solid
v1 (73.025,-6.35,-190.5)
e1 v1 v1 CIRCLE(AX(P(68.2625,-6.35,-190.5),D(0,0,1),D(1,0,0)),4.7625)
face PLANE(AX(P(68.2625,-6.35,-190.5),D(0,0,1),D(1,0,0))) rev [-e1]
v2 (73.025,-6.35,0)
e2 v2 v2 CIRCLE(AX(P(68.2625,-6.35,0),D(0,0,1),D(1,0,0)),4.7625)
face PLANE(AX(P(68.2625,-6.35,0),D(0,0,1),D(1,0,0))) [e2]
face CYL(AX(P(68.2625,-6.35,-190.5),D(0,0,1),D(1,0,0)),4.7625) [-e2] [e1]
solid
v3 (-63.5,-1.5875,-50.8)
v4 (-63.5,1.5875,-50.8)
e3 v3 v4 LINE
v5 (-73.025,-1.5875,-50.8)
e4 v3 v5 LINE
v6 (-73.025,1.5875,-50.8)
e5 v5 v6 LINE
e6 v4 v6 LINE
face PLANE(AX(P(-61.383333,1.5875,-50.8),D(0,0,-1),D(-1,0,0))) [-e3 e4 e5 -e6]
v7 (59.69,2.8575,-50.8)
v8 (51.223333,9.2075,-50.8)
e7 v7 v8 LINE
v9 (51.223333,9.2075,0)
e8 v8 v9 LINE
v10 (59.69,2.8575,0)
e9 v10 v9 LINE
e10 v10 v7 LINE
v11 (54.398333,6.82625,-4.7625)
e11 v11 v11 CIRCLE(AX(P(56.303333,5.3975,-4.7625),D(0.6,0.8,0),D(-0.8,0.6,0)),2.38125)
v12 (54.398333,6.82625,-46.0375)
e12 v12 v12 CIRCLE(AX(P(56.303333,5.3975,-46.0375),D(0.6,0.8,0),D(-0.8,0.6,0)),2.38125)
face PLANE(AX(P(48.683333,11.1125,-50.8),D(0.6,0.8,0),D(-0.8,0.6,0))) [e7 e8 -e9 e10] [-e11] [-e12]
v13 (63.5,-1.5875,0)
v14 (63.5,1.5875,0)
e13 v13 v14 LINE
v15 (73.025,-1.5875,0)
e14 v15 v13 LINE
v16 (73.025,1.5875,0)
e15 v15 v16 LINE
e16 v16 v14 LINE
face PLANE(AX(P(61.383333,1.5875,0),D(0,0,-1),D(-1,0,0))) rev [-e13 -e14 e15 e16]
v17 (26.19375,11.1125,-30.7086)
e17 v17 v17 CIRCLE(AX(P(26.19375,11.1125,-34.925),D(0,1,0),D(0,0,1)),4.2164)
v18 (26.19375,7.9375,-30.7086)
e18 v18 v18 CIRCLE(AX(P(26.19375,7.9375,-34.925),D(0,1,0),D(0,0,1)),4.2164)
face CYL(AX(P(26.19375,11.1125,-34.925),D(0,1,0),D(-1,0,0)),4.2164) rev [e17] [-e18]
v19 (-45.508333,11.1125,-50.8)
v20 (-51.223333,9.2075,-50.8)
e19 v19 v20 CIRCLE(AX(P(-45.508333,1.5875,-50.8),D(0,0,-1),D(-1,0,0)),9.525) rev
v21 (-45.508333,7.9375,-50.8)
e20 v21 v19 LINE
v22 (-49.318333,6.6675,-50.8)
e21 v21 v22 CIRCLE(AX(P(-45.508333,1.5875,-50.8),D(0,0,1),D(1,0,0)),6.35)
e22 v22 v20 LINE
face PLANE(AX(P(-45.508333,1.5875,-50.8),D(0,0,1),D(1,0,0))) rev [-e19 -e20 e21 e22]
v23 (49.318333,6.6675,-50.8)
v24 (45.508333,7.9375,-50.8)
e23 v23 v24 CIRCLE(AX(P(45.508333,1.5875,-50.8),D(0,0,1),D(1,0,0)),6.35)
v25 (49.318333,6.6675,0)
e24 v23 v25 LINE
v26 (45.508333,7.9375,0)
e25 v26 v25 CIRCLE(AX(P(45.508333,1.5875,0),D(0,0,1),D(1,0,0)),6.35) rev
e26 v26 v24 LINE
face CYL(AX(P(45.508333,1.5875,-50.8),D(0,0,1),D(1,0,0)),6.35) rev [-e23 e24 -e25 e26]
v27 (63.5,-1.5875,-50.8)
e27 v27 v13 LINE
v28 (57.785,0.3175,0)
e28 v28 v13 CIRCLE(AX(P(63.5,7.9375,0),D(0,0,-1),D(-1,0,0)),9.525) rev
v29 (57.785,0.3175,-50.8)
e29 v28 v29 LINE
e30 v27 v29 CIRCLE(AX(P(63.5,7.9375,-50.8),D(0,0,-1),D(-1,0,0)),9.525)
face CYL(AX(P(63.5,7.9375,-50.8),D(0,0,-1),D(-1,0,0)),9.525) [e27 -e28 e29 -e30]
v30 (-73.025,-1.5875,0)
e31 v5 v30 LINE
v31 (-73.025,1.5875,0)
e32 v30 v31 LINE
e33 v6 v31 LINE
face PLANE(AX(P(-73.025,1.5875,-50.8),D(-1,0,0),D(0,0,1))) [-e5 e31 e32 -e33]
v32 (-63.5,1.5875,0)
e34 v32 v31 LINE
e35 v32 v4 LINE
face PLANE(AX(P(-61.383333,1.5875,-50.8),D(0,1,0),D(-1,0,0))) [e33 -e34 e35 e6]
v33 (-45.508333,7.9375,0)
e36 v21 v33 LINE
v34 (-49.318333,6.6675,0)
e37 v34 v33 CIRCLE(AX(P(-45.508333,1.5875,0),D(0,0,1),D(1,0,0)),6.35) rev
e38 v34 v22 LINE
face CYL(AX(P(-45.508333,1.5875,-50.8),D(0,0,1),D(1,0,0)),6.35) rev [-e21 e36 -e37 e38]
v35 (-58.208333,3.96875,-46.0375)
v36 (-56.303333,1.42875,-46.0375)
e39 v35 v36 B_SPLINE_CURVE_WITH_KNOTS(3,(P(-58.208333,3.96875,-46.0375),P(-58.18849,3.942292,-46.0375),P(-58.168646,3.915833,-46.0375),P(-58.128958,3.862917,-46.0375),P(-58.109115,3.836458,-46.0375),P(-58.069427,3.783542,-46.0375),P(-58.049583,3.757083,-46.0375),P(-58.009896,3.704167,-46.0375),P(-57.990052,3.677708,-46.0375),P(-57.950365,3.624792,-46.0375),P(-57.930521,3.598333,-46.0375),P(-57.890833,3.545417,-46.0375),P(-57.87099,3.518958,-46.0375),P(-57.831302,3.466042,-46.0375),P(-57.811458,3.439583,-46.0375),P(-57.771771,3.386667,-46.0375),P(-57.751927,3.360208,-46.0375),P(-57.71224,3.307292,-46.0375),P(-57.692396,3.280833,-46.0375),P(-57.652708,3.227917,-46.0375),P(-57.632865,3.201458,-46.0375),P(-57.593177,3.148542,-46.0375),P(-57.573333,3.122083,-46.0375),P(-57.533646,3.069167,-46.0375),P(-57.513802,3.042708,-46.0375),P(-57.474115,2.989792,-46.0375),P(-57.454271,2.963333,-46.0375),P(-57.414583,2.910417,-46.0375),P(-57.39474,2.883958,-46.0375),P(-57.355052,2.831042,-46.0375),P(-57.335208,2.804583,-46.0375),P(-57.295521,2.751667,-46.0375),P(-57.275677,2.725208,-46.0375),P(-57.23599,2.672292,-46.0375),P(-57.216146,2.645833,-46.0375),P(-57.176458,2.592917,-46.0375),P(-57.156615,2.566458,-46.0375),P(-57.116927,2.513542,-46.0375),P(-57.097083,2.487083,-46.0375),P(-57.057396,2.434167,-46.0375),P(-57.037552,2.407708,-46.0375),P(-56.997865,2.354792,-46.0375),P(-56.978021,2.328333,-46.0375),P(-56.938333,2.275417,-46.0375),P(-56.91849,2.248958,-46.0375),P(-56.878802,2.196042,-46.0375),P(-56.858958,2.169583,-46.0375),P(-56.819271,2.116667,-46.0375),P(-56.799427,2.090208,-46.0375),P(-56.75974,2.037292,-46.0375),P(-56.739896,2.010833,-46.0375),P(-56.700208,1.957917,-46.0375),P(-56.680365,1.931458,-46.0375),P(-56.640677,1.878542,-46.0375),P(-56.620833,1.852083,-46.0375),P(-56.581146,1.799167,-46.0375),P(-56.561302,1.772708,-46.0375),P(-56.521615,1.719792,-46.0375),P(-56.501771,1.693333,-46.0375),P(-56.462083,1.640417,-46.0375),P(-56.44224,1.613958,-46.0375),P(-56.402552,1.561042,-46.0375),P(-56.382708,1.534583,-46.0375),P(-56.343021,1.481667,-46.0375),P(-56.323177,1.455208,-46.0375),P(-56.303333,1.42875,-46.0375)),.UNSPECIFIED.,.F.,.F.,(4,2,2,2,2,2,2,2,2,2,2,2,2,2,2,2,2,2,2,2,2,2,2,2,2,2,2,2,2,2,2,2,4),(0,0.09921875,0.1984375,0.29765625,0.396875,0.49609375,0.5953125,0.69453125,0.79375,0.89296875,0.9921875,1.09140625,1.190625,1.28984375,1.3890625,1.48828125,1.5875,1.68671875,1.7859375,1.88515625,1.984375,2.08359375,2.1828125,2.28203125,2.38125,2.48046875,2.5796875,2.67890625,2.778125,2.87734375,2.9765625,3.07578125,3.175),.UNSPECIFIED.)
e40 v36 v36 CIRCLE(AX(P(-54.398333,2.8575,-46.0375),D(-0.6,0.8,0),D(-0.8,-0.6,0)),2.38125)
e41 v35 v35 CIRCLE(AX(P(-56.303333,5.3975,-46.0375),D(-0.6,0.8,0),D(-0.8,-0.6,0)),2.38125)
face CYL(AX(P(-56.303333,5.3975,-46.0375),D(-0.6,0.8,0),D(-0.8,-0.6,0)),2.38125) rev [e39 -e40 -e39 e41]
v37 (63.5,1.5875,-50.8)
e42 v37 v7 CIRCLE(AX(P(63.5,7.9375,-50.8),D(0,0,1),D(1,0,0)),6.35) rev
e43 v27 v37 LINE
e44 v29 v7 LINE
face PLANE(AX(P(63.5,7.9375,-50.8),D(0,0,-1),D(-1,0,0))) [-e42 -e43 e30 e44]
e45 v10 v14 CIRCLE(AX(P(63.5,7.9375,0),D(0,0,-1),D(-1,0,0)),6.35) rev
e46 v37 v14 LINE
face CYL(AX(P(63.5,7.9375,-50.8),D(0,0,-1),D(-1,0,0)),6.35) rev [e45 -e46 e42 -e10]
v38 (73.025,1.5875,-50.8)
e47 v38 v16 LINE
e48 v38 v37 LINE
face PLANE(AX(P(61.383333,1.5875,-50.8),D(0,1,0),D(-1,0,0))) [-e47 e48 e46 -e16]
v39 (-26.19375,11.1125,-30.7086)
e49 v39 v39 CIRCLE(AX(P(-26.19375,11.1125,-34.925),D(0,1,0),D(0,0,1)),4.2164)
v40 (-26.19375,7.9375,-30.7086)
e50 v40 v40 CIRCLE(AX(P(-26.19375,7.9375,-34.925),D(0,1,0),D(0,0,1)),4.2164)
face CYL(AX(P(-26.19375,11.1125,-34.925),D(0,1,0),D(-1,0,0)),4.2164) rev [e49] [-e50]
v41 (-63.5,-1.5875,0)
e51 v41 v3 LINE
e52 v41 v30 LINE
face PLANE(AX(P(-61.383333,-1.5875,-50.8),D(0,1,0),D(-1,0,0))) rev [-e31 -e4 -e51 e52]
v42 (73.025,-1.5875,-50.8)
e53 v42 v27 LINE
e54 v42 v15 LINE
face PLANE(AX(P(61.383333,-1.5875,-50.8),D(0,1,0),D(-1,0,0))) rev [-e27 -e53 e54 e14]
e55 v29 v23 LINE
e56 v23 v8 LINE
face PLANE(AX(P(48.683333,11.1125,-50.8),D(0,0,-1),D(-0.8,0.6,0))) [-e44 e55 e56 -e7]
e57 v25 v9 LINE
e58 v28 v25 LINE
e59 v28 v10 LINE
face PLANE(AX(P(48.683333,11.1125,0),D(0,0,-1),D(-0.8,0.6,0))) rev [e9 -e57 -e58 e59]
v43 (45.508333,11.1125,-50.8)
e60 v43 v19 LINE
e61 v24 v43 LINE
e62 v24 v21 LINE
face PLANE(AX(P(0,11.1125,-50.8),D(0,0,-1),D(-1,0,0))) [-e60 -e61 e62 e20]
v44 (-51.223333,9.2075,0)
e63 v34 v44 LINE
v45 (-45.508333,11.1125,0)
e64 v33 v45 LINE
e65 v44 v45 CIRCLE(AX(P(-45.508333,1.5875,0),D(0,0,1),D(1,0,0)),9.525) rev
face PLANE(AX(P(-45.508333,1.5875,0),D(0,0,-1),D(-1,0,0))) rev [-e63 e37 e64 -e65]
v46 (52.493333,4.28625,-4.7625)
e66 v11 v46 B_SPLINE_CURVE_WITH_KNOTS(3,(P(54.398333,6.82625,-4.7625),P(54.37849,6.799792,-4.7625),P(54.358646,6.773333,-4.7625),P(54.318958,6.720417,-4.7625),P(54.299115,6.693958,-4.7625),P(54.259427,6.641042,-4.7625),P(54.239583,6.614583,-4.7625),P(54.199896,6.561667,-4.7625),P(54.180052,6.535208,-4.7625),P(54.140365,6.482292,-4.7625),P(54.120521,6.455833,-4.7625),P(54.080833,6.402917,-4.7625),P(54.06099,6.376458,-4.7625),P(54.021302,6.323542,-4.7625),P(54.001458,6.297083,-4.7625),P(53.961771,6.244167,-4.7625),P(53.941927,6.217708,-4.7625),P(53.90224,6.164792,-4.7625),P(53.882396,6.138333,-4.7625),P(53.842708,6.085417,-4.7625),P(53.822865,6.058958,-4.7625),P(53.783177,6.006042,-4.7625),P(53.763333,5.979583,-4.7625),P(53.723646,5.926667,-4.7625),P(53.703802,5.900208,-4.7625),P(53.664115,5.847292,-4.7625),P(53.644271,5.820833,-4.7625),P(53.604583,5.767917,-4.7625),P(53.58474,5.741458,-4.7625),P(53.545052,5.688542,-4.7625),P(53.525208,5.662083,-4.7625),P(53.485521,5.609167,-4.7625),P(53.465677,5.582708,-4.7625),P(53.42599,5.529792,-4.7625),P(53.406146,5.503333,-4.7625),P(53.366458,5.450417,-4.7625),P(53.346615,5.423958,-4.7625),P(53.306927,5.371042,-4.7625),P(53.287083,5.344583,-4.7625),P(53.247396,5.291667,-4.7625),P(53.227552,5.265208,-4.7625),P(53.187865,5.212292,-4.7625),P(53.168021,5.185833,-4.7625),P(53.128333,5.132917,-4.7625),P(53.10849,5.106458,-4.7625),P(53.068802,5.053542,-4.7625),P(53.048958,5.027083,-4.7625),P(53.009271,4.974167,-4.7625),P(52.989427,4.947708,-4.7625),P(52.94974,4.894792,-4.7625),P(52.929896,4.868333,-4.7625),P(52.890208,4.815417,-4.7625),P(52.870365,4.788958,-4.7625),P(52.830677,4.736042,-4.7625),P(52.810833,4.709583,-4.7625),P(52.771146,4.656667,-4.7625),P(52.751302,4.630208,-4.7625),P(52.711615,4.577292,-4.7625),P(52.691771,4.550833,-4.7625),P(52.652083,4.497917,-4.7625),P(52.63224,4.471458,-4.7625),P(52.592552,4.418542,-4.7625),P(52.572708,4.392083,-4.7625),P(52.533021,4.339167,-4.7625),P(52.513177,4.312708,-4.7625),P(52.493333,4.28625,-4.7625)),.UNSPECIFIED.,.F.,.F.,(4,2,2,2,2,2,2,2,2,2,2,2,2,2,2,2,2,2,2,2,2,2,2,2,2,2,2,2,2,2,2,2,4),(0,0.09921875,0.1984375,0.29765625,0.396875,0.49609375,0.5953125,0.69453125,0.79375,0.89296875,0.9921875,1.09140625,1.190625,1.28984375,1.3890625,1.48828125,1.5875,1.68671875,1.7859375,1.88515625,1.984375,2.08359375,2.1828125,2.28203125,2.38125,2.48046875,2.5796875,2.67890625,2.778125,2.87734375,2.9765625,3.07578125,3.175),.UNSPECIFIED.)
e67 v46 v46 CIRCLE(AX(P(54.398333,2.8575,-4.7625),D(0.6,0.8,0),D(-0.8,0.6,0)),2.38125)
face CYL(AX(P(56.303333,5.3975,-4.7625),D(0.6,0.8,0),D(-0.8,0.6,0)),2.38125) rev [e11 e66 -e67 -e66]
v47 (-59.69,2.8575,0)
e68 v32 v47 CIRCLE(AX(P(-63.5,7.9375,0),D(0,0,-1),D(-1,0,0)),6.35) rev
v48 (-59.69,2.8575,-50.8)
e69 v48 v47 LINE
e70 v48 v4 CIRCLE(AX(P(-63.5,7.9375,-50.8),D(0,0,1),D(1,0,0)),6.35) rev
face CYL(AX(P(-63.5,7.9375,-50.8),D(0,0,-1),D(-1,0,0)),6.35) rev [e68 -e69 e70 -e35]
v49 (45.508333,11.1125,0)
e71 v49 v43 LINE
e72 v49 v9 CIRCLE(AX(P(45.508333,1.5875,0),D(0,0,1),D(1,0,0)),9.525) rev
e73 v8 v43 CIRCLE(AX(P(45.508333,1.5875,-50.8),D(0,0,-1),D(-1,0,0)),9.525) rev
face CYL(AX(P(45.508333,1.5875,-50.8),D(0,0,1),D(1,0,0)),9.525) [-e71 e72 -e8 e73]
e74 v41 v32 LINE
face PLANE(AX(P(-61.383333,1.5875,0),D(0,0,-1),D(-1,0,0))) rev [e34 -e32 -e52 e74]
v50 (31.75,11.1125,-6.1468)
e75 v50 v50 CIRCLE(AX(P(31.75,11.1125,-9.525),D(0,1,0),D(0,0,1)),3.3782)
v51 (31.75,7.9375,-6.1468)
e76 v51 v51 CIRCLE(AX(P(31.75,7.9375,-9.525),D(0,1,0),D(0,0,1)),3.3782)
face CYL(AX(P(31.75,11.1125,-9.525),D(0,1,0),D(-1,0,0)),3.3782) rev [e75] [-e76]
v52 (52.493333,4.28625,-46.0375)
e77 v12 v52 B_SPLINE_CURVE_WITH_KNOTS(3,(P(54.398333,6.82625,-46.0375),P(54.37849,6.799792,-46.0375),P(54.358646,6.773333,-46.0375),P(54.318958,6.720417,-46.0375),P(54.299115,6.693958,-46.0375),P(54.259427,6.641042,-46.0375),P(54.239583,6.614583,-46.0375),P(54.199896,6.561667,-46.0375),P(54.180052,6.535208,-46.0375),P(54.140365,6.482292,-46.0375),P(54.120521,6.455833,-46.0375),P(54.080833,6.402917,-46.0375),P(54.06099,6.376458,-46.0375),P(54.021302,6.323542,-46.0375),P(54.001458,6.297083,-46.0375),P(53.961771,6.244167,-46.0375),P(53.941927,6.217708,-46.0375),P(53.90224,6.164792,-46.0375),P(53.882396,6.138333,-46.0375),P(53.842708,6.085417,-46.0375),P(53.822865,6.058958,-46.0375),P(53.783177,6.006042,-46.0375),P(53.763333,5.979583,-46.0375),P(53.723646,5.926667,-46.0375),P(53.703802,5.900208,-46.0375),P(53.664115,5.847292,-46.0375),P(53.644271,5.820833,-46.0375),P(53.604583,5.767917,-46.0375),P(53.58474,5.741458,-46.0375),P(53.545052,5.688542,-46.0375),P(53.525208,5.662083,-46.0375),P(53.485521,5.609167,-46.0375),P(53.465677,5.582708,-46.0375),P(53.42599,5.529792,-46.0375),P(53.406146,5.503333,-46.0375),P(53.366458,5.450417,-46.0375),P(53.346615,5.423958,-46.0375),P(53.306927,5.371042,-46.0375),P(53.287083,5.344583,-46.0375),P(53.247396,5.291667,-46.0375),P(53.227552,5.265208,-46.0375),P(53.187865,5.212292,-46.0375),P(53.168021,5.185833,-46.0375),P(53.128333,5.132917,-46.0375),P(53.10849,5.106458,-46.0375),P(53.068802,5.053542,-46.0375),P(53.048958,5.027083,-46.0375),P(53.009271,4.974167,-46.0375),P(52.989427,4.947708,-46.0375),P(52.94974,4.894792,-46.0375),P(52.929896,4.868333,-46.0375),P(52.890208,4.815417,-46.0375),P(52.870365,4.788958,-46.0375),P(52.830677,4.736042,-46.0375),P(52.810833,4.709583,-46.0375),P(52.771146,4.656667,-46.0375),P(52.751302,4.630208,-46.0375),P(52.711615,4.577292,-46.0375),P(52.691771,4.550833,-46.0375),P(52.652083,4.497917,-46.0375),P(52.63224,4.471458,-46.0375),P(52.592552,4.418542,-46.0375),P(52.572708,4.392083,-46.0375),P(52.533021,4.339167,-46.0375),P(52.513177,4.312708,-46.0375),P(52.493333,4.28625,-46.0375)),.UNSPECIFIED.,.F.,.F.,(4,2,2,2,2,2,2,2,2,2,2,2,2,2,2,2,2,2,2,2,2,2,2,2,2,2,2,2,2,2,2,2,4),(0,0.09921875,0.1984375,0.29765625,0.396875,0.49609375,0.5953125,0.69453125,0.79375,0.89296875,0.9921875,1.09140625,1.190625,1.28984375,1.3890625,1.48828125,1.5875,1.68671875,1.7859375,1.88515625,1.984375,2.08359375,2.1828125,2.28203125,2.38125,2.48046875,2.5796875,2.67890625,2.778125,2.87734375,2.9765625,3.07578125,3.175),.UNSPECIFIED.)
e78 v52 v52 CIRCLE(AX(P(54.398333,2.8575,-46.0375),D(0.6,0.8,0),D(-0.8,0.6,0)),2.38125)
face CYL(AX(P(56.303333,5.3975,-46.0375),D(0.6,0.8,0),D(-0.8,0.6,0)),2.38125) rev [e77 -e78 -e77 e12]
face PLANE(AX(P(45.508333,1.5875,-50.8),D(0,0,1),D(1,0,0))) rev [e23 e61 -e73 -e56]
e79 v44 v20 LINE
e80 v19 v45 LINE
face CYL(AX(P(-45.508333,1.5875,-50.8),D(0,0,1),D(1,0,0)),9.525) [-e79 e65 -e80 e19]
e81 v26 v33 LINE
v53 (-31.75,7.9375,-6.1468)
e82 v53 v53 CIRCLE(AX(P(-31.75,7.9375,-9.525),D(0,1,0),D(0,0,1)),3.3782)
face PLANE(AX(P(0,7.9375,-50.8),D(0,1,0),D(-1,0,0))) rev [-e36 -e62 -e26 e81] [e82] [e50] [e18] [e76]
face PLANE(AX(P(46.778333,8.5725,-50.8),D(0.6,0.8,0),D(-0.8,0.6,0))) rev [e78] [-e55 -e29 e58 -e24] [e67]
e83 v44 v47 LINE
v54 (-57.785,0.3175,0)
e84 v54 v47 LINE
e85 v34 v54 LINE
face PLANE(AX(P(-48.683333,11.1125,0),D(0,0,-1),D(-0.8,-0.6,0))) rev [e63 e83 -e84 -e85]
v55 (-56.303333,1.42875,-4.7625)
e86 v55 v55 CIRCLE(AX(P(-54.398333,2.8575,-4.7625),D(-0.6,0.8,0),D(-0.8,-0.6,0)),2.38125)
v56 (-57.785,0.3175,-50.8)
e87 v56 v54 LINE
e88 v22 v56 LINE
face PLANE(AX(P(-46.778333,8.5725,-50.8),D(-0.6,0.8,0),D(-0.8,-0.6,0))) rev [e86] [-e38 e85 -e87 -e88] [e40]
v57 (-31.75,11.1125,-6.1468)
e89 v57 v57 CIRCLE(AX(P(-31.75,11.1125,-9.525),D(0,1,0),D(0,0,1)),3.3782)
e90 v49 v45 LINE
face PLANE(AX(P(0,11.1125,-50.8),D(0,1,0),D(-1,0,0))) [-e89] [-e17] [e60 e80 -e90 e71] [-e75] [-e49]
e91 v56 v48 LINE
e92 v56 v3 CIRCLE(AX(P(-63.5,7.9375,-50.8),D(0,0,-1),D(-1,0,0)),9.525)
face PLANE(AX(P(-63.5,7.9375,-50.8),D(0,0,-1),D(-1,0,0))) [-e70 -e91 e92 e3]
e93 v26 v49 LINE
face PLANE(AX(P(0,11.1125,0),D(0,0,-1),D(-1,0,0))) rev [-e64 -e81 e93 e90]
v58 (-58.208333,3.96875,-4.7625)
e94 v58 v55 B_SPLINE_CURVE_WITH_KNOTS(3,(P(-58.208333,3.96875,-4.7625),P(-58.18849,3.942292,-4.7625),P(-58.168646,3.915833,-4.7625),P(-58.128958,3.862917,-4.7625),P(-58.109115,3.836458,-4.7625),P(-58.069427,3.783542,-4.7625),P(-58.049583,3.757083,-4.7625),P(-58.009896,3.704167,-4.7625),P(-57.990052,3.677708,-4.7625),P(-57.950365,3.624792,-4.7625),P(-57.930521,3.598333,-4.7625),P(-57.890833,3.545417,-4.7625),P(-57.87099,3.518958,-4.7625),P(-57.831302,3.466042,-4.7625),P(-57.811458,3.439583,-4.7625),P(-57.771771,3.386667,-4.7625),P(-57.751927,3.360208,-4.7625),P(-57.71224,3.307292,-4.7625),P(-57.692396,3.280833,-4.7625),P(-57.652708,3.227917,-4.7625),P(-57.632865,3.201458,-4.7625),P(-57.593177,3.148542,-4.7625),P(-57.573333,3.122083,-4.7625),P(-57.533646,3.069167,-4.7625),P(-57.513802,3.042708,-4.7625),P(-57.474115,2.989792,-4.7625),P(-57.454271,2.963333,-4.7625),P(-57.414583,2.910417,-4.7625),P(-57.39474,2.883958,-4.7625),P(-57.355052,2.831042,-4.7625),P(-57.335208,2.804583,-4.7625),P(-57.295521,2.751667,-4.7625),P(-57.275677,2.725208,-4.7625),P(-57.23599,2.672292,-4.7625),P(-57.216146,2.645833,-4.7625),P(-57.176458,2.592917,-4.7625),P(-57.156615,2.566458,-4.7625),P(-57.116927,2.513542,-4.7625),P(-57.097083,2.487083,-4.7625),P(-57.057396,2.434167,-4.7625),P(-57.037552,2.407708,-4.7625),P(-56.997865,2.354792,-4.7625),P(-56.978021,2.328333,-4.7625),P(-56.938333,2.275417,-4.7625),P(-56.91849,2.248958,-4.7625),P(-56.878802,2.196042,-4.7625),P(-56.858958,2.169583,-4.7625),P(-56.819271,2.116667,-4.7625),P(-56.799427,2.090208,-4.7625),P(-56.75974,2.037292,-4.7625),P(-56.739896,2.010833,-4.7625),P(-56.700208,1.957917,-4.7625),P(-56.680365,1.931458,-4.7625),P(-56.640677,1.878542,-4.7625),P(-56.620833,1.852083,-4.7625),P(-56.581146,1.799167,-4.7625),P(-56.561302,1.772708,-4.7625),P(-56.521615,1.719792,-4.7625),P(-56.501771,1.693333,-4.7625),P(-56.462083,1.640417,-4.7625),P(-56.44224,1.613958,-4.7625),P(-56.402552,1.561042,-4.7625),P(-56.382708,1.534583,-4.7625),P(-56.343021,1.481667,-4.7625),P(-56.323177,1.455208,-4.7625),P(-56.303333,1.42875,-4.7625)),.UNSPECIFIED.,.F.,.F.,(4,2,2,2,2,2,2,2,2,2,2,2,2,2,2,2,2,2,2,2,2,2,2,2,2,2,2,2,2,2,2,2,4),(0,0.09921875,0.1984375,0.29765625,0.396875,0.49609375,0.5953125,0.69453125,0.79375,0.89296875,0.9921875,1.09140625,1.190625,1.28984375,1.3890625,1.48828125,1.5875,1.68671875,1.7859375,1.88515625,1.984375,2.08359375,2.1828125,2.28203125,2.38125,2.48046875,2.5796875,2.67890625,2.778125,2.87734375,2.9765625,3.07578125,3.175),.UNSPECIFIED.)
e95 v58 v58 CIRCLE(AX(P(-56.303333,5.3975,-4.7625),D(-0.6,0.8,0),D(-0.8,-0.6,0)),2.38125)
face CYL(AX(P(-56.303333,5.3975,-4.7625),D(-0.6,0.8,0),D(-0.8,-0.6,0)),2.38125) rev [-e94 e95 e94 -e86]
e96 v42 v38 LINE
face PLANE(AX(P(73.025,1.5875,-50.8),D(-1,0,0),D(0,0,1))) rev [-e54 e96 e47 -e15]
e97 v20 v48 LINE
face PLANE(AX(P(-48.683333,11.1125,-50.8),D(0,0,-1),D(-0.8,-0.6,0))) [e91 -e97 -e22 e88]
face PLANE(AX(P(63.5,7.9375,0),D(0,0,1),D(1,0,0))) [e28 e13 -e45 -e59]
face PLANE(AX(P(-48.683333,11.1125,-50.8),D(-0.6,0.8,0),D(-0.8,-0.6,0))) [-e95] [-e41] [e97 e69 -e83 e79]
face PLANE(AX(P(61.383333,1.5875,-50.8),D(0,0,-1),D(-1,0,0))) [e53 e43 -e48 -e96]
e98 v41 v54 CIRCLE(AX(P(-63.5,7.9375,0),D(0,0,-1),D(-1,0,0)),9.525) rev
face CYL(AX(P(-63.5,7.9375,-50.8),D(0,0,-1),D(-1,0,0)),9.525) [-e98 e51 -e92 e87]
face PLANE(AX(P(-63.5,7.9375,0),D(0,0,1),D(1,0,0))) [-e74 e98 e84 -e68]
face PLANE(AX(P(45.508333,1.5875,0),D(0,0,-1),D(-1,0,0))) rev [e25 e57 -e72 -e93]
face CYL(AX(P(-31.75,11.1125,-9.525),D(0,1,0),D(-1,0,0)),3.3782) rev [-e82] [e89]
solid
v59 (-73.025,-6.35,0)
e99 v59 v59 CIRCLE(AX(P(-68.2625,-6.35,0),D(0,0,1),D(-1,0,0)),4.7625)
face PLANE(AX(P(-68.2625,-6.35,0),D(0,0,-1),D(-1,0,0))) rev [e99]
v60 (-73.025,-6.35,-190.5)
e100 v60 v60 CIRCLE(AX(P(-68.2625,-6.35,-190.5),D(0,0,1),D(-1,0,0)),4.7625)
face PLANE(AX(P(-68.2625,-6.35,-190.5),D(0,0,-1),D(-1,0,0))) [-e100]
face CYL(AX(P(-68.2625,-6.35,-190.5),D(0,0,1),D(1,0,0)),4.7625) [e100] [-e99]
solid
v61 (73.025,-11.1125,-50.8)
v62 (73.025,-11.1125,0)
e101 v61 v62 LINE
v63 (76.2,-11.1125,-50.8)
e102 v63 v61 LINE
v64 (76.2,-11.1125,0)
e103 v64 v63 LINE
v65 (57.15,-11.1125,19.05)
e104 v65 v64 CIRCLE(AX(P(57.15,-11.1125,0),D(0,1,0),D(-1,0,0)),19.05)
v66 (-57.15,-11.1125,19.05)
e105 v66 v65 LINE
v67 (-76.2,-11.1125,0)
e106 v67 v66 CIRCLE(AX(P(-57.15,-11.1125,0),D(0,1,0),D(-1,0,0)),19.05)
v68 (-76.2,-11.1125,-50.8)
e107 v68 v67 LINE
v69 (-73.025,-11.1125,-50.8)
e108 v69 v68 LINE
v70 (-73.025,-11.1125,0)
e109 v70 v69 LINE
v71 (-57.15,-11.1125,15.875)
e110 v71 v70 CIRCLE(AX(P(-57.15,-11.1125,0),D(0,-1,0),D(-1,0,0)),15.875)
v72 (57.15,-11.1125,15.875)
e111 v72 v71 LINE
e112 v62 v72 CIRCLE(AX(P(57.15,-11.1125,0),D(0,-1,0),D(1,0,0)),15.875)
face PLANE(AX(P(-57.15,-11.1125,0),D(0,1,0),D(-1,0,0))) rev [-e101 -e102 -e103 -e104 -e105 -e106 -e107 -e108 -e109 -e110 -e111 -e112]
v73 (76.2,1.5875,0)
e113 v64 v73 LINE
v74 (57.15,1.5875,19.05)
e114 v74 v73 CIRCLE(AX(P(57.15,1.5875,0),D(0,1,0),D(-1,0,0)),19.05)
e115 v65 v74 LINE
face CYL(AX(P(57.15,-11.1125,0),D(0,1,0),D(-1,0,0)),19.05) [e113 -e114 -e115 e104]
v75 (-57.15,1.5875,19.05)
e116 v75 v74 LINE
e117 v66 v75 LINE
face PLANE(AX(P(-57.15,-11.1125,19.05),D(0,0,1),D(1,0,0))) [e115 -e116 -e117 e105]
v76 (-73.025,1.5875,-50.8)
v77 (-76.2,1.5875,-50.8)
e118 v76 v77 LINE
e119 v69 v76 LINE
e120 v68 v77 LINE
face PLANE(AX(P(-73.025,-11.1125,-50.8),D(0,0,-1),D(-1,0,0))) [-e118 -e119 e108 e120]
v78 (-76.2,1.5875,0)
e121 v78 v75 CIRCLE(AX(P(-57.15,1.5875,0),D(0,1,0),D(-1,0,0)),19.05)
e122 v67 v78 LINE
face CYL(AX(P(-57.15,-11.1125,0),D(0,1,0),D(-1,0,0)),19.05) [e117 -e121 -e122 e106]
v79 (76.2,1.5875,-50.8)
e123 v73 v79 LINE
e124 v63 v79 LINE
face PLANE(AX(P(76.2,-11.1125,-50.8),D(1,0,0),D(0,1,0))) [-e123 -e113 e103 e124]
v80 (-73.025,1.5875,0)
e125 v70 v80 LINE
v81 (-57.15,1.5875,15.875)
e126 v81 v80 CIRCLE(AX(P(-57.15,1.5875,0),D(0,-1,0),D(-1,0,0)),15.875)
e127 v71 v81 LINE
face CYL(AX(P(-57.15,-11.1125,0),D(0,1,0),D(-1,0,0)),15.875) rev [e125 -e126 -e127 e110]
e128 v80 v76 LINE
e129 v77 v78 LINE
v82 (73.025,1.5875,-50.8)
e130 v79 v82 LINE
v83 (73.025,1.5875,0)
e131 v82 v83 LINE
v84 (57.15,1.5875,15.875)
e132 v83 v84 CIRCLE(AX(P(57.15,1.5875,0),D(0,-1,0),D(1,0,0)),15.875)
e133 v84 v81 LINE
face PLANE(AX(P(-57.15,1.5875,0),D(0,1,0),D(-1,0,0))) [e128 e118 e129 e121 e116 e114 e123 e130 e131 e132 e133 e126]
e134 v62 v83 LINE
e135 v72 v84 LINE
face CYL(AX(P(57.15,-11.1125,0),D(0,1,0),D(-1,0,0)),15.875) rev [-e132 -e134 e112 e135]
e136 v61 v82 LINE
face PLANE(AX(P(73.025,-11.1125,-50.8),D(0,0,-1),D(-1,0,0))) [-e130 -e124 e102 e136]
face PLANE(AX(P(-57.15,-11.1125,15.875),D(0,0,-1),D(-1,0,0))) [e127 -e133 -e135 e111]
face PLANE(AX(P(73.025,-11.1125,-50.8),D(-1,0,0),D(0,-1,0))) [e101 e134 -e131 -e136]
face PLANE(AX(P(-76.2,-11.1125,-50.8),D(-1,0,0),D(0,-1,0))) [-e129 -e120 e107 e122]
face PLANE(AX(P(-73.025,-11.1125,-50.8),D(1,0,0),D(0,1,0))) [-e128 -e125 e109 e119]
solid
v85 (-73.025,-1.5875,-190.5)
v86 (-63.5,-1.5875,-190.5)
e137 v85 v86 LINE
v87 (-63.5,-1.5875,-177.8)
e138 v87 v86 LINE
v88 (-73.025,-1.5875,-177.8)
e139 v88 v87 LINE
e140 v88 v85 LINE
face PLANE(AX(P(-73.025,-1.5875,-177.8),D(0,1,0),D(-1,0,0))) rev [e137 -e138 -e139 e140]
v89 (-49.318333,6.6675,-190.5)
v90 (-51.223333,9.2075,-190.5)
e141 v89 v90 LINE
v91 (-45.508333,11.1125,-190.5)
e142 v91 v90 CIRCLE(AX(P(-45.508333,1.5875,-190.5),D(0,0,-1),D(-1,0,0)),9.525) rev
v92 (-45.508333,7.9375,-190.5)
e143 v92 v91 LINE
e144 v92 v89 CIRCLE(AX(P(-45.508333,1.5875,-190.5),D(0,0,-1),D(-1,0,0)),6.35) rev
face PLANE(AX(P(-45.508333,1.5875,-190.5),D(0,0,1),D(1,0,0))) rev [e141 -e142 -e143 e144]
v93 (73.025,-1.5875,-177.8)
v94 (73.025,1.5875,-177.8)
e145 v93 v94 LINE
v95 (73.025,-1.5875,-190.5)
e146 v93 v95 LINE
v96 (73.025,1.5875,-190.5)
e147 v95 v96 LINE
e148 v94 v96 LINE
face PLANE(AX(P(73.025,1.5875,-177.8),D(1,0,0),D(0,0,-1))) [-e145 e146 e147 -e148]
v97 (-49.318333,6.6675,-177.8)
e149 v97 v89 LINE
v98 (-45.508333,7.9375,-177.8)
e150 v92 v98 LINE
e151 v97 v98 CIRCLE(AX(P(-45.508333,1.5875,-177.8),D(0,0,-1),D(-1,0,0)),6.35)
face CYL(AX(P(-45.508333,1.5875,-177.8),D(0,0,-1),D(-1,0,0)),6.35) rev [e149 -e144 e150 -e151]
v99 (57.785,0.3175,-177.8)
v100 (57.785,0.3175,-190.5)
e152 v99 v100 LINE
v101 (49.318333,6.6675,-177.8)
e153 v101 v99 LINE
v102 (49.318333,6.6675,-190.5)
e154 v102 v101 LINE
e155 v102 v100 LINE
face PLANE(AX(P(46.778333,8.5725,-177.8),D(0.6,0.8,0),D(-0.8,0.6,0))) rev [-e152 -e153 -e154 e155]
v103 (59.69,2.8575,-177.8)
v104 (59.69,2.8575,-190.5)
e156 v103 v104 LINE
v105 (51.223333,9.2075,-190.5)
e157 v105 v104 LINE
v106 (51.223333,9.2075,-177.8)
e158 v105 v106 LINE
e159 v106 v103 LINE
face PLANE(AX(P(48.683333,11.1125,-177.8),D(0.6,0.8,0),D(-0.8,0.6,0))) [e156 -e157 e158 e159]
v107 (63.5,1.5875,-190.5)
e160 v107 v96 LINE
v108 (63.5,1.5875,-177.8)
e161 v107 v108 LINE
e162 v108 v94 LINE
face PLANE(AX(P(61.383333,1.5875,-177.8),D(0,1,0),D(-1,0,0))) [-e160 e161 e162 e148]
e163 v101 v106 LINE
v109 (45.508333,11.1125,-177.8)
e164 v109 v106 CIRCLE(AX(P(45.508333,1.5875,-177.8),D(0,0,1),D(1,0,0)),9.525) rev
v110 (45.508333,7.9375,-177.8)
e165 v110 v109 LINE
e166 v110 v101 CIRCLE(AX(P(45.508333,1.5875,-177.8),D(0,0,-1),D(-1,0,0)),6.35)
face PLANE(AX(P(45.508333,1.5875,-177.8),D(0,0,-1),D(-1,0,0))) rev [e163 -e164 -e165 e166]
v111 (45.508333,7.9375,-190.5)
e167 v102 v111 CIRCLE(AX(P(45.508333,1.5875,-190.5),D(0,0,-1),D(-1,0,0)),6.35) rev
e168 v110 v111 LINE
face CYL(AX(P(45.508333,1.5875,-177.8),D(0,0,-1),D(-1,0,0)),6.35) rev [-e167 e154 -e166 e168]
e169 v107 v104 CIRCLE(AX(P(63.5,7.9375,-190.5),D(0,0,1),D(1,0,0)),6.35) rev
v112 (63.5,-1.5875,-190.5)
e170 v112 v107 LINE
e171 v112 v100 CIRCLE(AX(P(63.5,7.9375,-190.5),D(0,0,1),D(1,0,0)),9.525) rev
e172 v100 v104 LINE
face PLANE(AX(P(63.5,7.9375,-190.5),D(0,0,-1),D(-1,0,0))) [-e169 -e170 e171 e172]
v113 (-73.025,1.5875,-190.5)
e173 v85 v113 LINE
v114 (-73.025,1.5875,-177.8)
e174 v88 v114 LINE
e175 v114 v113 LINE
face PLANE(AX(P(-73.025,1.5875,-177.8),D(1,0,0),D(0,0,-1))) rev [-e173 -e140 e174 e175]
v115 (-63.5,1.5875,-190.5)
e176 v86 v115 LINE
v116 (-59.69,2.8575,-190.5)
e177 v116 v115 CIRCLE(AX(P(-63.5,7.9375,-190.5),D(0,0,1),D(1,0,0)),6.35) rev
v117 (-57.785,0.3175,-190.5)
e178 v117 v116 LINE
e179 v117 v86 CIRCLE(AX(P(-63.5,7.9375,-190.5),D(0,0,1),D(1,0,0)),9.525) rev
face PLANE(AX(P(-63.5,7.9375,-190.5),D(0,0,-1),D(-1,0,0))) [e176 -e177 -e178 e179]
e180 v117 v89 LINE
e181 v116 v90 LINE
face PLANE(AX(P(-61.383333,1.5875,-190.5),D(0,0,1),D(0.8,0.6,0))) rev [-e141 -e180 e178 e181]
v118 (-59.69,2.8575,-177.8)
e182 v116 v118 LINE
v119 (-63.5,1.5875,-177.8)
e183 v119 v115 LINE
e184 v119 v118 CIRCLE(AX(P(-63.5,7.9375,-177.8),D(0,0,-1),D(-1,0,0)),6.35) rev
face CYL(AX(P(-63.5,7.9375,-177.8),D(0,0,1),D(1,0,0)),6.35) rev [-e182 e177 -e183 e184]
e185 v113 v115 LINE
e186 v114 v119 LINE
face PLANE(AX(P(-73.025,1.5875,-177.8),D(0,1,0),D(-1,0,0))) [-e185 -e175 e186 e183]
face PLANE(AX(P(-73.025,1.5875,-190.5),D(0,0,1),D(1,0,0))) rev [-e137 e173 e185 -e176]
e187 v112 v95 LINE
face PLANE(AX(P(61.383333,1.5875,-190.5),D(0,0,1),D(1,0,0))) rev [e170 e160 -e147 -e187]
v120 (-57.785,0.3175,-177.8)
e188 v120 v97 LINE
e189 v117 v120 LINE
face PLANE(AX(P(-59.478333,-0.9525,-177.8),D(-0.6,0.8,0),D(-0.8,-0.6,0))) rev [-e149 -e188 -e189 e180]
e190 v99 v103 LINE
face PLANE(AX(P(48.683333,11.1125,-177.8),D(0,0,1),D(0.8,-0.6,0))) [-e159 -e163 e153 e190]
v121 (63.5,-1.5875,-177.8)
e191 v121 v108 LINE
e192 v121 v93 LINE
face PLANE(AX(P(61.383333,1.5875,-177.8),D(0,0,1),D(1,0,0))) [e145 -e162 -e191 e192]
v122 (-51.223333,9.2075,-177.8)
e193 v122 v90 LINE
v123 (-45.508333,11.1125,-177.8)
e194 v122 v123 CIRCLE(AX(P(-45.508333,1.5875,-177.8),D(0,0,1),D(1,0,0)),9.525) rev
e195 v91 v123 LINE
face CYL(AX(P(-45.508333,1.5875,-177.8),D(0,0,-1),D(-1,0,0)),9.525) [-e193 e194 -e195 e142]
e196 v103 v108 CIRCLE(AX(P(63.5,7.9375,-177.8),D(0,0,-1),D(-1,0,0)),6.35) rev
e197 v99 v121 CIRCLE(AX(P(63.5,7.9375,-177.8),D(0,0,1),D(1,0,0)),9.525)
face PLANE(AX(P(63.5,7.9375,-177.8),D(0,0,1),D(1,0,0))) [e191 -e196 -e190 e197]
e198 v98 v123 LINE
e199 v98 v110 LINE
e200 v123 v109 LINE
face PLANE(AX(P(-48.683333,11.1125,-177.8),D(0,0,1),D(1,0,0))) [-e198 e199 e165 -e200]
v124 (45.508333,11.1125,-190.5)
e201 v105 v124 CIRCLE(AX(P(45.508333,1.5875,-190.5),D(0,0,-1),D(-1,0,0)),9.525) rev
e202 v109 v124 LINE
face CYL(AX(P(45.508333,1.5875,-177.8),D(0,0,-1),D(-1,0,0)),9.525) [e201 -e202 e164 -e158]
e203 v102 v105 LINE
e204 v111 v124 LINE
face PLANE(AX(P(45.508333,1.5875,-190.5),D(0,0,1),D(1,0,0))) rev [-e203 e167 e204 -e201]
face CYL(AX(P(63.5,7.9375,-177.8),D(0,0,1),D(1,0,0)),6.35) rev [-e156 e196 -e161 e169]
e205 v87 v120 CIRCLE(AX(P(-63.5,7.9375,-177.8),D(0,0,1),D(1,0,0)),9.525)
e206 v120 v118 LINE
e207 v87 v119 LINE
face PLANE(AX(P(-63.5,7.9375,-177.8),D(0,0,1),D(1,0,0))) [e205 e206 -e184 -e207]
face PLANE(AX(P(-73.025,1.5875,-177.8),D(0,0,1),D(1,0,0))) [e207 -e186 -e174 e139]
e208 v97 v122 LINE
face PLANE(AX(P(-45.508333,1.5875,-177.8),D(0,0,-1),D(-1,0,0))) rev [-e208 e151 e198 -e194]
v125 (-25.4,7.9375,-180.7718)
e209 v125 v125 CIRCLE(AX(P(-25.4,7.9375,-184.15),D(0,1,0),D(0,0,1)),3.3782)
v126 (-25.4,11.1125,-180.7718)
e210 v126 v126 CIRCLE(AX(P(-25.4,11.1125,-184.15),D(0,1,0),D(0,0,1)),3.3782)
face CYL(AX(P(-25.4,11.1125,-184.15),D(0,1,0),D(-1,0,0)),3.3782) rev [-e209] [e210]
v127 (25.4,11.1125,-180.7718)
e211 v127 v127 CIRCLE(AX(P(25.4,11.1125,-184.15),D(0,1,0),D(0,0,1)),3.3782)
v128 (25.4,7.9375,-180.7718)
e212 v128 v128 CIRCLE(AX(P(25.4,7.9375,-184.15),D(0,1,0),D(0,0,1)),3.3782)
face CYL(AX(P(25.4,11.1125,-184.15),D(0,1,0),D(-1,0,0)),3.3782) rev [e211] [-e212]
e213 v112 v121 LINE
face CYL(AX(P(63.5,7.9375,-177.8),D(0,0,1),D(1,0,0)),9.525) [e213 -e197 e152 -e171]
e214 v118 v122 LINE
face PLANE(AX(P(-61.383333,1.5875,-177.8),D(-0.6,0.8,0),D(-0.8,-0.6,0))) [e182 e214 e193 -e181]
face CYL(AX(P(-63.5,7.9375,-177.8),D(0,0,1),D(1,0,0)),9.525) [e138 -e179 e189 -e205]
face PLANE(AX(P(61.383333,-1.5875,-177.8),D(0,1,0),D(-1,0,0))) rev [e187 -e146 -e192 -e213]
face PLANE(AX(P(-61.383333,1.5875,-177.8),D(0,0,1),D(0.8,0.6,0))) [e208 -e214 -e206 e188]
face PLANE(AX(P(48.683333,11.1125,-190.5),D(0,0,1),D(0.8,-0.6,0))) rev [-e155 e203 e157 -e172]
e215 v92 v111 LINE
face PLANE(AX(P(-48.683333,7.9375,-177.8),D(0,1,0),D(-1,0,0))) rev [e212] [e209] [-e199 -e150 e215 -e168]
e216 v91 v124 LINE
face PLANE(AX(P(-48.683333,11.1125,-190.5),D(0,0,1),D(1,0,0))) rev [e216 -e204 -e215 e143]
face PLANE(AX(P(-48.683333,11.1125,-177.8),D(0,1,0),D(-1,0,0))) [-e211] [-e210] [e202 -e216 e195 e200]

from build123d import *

# Parameters (mm, degrees)
BOSS_EXTRUDE1_DEPTH                     = 50.8
BOSS_EXTRUDE3_DEPTH                     = 12.7
SKETCH475_R                             = 4.7625
BOSS_EXTRUDE4_DEPTH                     = 190.5
BOSS_EXTRUDE4_2_DEPTH                   = 190.5
BOSS_EXTRUDE5_DEPTH                     = 12.7
SKETCH480_W                             = 4.2164
SKETCH480_H                             = 22.225
F_5_16_CLEARANCE_HOLE1_AT_2_COUNT       = 2
F_5_16_CLEARANCE_HOLE1_AT_2_PITCH       = 52.3875
SKETCH482_W                             = 3.3782
SKETCH482_H                             = 22.225
F_1_4_CLEARANCE_HOLE1_AT_2_COUNT        = 2
F_1_4_CLEARANCE_HOLE1_AT_2_PITCH        = 63.5
F_1_4_CLEARANCE_HOLE1_AT_3_COUNT        = 2
F_1_4_CLEARANCE_HOLE1_AT_3_PITCH        = 174.740416404
F_1_4_CLEARANCE_HOLE1_AT_4_COUNT        = 2
F_1_4_CLEARANCE_HOLE1_AT_4_PITCH        = 183.738980962
SKETCH484_W                             = 2.38125
SKETCH484_H                             = 83.185
F_3_16_0_1875_DIAMETER_HOLE1_AT_2_COUNT = 2
F_3_16_0_1875_DIAMETER_HOLE1_AT_2_PITCH = 41.275
MIRROR1_COPY_1_SKETCH_W                 = 2.38125
MIRROR1_COPY_1_SKETCH_H                 = 83.185
CONVERT_SOLID1_START                    = -50.8
CONVERT_SOLID1_DEPTH                    = 50.8
CONVERT_SOLID1_2_DEPTH                  = 50.8
CONVERT_SOLID2_START                    = -190.5
CONVERT_SOLID2_DEPTH                    = 12.7
CONVERT_SOLID2_2_DEPTH                  = 12.7


# Read off the part's stored shape, not the designer's step: Convert-Solid1, Convert-Solid2
with BuildPart() as part:
    # Sketch1 → Boss-Extrude1 (new body)
    with BuildSketch(Plane.XY):
        Polygon((0, 7.9375), (47.625, 7.9375), (60.325, -1.5875), (73.025, -1.5875), (73.025, 1.5875), (61.383333333, 1.5875), (48.683333333, 11.1125), (0, 11.1125), (-48.683333333, 11.1125), (-61.383333333, 1.5875), (-73.025, 1.5875), (-73.025, -1.5875), (-60.325, -1.5875), (-47.625, 7.9375), align=None)
    extrude(amount=-BOSS_EXTRUDE1_DEPTH)

    # Sketch480 → 5/16 Clearance Hole1 (revolve, cut)
    with BuildSketch(Plane(origin=(-26.19375, 11.1125, -34.925), x_dir=(0, 0, 1), z_dir=(1, 0, 0))):
        with Locations((2.1082, 11.1125)):
            Rectangle(SKETCH480_W, SKETCH480_H)
    f_5_16_clearance_hole1 = revolve(axis=Axis((-26.19375, 17.4625, -34.925), (0, -1, 0)), mode=Mode.SUBTRACT)

    # 5/16 Clearance Hole1 at 2: 5/16 Clearance Hole1 ×2
    with Locations(*[(i * F_5_16_CLEARANCE_HOLE1_AT_2_PITCH, 0, 0) for i in range(1, F_5_16_CLEARANCE_HOLE1_AT_2_COUNT)]):
        add(f_5_16_clearance_hole1, mode=Mode.SUBTRACT)

    # Sketch482 → 1/4 Clearance Hole1 (revolve, cut)
    with BuildSketch(Plane(origin=(-31.75, 11.1125, -9.525), x_dir=(0, 0, 1), z_dir=(1, 0, 0))):
        with Locations((1.6891, 11.1125)):
            Rectangle(SKETCH482_W, SKETCH482_H)
    f_1_4_clearance_hole1 = revolve(axis=Axis((-31.75, 17.4625, -9.525), (0, -1, 0)), mode=Mode.SUBTRACT)

    # 1/4 Clearance Hole1 at 2: 1/4 Clearance Hole1 ×2
    with Locations(*[(i * F_1_4_CLEARANCE_HOLE1_AT_2_PITCH, 0, 0) for i in range(1, F_1_4_CLEARANCE_HOLE1_AT_2_COUNT)]):
        add(f_1_4_clearance_hole1, mode=Mode.SUBTRACT)

    # Sketch484 → 3/16 (0.1875) Diameter Hole1 (revolve, cut)
    with BuildSketch(Plane(origin=(56.303333333, 5.3975, -46.0375), x_dir=(-0.7999999999999998, 0.6000000000000002, 0), z_dir=(0, 0, 1))):
        with Locations((1.190625, 41.5925)):
            Rectangle(SKETCH484_W, SKETCH484_H)
    f_3_16_0_1875_diameter_hole1 = revolve(axis=Axis((60.113333333, 10.4775, -46.0375), (-0.6000000000000003, -0.7999999999999998, 0)), mode=Mode.SUBTRACT)

    # 3/16 (0.1875) Diameter Hole1 at 2: 3/16 (0.1875) Diameter Hole1 ×2
    with Locations(*[(0, 0, i * F_3_16_0_1875_DIAMETER_HOLE1_AT_2_PITCH) for i in range(1, F_3_16_0_1875_DIAMETER_HOLE1_AT_2_COUNT)]):
        add(f_3_16_0_1875_diameter_hole1, mode=Mode.SUBTRACT)

    # Mirror1: 3/16 (0.1875) Diameter Hole1 across plane
    add(f_3_16_0_1875_diameter_hole1.mirror(Plane(origin=(0, 0, 0), x_dir=(0, 0, 1), z_dir=(1, 0, 0))), mode=Mode.SUBTRACT)

    # Mirror1 copy 1 sketch → Mirror1 copy 1 (revolve, cut)
    with BuildSketch(Plane(origin=(-56.303333333, 5.3975, -4.7625), x_dir=(0.7999999999999998, 0.6000000000000002, 0), z_dir=(0, 0, 1))):
        with Locations((1.190625, -41.5925)):
            Rectangle(MIRROR1_COPY_1_SKETCH_W, MIRROR1_COPY_1_SKETCH_H)
    revolve(axis=Axis((-60.113333333, 10.4775, -4.7625), (-0.6000000000000003, 0.7999999999999998, 0)), mode=Mode.SUBTRACT)

    # Convert-Solid1 outline → Convert-Solid1 (cut)
    with BuildSketch(Plane.XY.offset(CONVERT_SOLID1_START)):
        with BuildLine():
            ThreePointArc((63.5, -1.5875), (60.487930529, -1.098708414), (57.785, 0.3175))
            Line((57.785, 0.3175), (60.325, -1.5875))
            Line((60.325, -1.5875), (63.5, -1.5875))
        make_face()
        with BuildLine():
            Line((-60.325, -1.5875), (-57.785, 0.3175))
            ThreePointArc((-57.785, 0.3175), (-60.487930529, -1.098708414), (-63.5, -1.5875))
            Line((-63.5, -1.5875), (-60.325, -1.5875))
        make_face()
        with BuildLine():
            ThreePointArc((45.508333333, 11.1125), (48.520402804, 10.623708414), (51.223333333, 9.2075))
            Line((51.223333333, 9.2075), (48.683333333, 11.1125))
            Line((48.683333333, 11.1125), (45.508333333, 11.1125))
        make_face()
        with BuildLine():
            ThreePointArc((-51.223333333, 9.2075), (-48.520402804, 10.623708414), (-45.508333333, 11.1125))
            Line((-45.508333333, 11.1125), (-48.683333333, 11.1125))
            Line((-48.683333333, 11.1125), (-51.223333333, 9.2075))
        make_face()
    extrude(amount=CONVERT_SOLID1_DEPTH, mode=Mode.SUBTRACT)

    # Convert-Solid1 2 outline → Convert-Solid1 2 (add)
    with BuildSketch(Plane.XY.offset(CONVERT_SOLID1_START)):
        with BuildLine():
            Line((61.383333333, 1.5875), (63.5, 1.5875))
            ThreePointArc((63.5, 1.5875), (61.491953686, 1.913361057), (59.69, 2.8575))
            Line((59.69, 2.8575), (61.383333333, 1.5875))
        make_face()
        with BuildLine():
            ThreePointArc((45.508333333, 7.9375), (47.516379647, 7.611638943), (49.318333333, 6.6675))
            Line((49.318333333, 6.6675), (47.625, 7.9375))
            Line((47.625, 7.9375), (45.508333333, 7.9375))
        make_face()
        with BuildLine():
            Line((-47.625, 7.9375), (-49.318333333, 6.6675))
            ThreePointArc((-49.318333333, 6.6675), (-47.516379647, 7.611638943), (-45.508333333, 7.9375))
            Line((-45.508333333, 7.9375), (-47.625, 7.9375))
        make_face()
        with BuildLine():
            Line((-63.5, 1.5875), (-61.383333333, 1.5875))
            Line((-61.383333333, 1.5875), (-59.69, 2.8575))
            ThreePointArc((-59.69, 2.8575), (-61.491953686, 1.913361057), (-63.5, 1.5875))
        make_face()
    extrude(amount=CONVERT_SOLID1_2_DEPTH)


with BuildPart() as body_2:
    # Sketch474 → Boss-Extrude3 (new body)
    with BuildSketch(Plane(origin=(0, 1.5875, 0), x_dir=(1, 0, 0), z_dir=(0, 1, 0))):
        with BuildLine():
            Line((-73.025, 50.8), (-73.025, 0))
            ThreePointArc((-73.025, 0), (-68.375320151, -11.225320151), (-57.15, -15.875))
            Line((-57.15, -15.875), (57.15, -15.875))
            ThreePointArc((57.15, -15.875), (68.375320151, -11.225320151), (73.025, 0))
            Line((73.025, 0), (73.025, 50.8))
            Line((73.025, 50.8), (76.2, 50.8))
            Line((76.2, 50.8), (76.2, 0))
            ThreePointArc((76.2, 0), (70.620384182, -13.470384182), (57.15, -19.05))
            Line((57.15, -19.05), (-57.15, -19.05))
            ThreePointArc((-57.15, -19.05), (-70.620384182, -13.470384182), (-76.2, 0))
            Line((-76.2, 0), (-76.2, 50.8))
            Line((-76.2, 50.8), (-73.025, 50.8))
        make_face()
    extrude(amount=-BOSS_EXTRUDE3_DEPTH)


with BuildPart() as body_3:
    # Sketch475 → Boss-Extrude4 (new body)
    with BuildSketch(Plane.XY):
        with Locations((68.2625, -6.35)):
            Circle(SKETCH475_R)
    extrude(amount=-BOSS_EXTRUDE4_DEPTH)


with BuildPart() as body_4:
    # Sketch475 → Boss-Extrude4 2 (new body)
    with BuildSketch(Plane.XY):
        with Locations(Location((-68.2625, -6.35, 0), (0, 0, 180))):
            Circle(SKETCH475_R)
    extrude(amount=-BOSS_EXTRUDE4_2_DEPTH)


with BuildPart() as body_5:
    # Sketch477 → Boss-Extrude5 (new body)
    with BuildSketch(Plane(origin=(0, 0, -190.5), x_dir=(-1, 0, 0), z_dir=(0, 0, -1))):
        Polygon((-60.325, -1.5875), (-47.625, 7.9375), (47.625, 7.9375), (60.325, -1.5875), (73.025, -1.5875), (73.025, 1.5875), (61.383333333, 1.5875), (48.683333333, 11.1125), (-48.683333333, 11.1125), (-61.383333333, 1.5875), (-73.025, 1.5875), (-73.025, -1.5875), align=None)
    extrude(amount=-BOSS_EXTRUDE5_DEPTH)

    # 1/4 Clearance Hole1 at 3: 1/4 Clearance Hole1 ×2
    with Locations(*[Vector(0.03633961810714297, 0, -0.9993394979464322) * (i * F_1_4_CLEARANCE_HOLE1_AT_3_PITCH) for i in range(1, F_1_4_CLEARANCE_HOLE1_AT_3_COUNT)]):
        add(f_1_4_clearance_hole1, mode=Mode.SUBTRACT)

    # 1/4 Clearance Hole1 at 4: 1/4 Clearance Hole1 ×2
    with Locations(*[Vector(0.3110390604146254, 0, -0.9503971290446889) * (i * F_1_4_CLEARANCE_HOLE1_AT_4_PITCH) for i in range(1, F_1_4_CLEARANCE_HOLE1_AT_4_COUNT)]):
        add(f_1_4_clearance_hole1, mode=Mode.SUBTRACT)

    # Convert-Solid2 outline → Convert-Solid2 (cut)
    with BuildSketch(Plane.XY.offset(CONVERT_SOLID2_START)):
        with BuildLine():
            Line((48.683333333, 11.1125), (45.508333333, 11.1125))
            ThreePointArc((45.508333333, 11.1125), (48.520402804, 10.623708414), (51.223333333, 9.2075))
            Line((51.223333333, 9.2075), (48.683333333, 11.1125))
        make_face()
        with BuildLine():
            Line((-48.683333333, 11.1125), (-51.223333333, 9.2075))
            ThreePointArc((-51.223333333, 9.2075), (-48.520402804, 10.623708414), (-45.508333333, 11.1125))
            Line((-45.508333333, 11.1125), (-48.683333333, 11.1125))
        make_face()
        with BuildLine():
            ThreePointArc((63.5, -1.5875), (60.487930529, -1.098708414), (57.785, 0.3175))
            Line((57.785, 0.3175), (60.325, -1.5875))
            Line((60.325, -1.5875), (63.5, -1.5875))
        make_face()
        with BuildLine():
            ThreePointArc((-57.785, 0.3175), (-60.487930529, -1.098708414), (-63.5, -1.5875))
            Line((-63.5, -1.5875), (-60.325, -1.5875))
            Line((-60.325, -1.5875), (-57.785, 0.3175))
        make_face()
    extrude(amount=CONVERT_SOLID2_DEPTH, mode=Mode.SUBTRACT)

    # Convert-Solid2 2 outline → Convert-Solid2 2 (add)
    with BuildSketch(Plane.XY.offset(CONVERT_SOLID2_START)):
        with BuildLine():
            ThreePointArc((63.5, 1.5875), (61.491953686, 1.913361057), (59.69, 2.8575))
            Line((59.69, 2.8575), (61.383333333, 1.5875))
            Line((61.383333333, 1.5875), (63.5, 1.5875))
        make_face()
        with BuildLine():
            ThreePointArc((-59.69, 2.8575), (-61.491953686, 1.913361057), (-63.5, 1.5875))
            Line((-63.5, 1.5875), (-61.383333333, 1.5875))
            Line((-61.383333333, 1.5875), (-59.69, 2.8575))
        make_face()
        with BuildLine():
            Line((47.625, 7.9375), (45.508333333, 7.9375))
            ThreePointArc((45.508333333, 7.9375), (47.516379647, 7.611638943), (49.318333333, 6.6675))
            Line((49.318333333, 6.6675), (47.625, 7.9375))
        make_face()
        with BuildLine():
            Line((-47.625, 7.9375), (-49.318333333, 6.6675))
            ThreePointArc((-49.318333333, 6.6675), (-47.516379647, 7.611638943), (-45.508333333, 7.9375))
            Line((-45.508333333, 7.9375), (-47.625, 7.9375))
        make_face()
    extrude(amount=CONVERT_SOLID2_2_DEPTH)


solid = Compound([part.part, body_2.part, body_3.part, body_4.part, body_5.part])
